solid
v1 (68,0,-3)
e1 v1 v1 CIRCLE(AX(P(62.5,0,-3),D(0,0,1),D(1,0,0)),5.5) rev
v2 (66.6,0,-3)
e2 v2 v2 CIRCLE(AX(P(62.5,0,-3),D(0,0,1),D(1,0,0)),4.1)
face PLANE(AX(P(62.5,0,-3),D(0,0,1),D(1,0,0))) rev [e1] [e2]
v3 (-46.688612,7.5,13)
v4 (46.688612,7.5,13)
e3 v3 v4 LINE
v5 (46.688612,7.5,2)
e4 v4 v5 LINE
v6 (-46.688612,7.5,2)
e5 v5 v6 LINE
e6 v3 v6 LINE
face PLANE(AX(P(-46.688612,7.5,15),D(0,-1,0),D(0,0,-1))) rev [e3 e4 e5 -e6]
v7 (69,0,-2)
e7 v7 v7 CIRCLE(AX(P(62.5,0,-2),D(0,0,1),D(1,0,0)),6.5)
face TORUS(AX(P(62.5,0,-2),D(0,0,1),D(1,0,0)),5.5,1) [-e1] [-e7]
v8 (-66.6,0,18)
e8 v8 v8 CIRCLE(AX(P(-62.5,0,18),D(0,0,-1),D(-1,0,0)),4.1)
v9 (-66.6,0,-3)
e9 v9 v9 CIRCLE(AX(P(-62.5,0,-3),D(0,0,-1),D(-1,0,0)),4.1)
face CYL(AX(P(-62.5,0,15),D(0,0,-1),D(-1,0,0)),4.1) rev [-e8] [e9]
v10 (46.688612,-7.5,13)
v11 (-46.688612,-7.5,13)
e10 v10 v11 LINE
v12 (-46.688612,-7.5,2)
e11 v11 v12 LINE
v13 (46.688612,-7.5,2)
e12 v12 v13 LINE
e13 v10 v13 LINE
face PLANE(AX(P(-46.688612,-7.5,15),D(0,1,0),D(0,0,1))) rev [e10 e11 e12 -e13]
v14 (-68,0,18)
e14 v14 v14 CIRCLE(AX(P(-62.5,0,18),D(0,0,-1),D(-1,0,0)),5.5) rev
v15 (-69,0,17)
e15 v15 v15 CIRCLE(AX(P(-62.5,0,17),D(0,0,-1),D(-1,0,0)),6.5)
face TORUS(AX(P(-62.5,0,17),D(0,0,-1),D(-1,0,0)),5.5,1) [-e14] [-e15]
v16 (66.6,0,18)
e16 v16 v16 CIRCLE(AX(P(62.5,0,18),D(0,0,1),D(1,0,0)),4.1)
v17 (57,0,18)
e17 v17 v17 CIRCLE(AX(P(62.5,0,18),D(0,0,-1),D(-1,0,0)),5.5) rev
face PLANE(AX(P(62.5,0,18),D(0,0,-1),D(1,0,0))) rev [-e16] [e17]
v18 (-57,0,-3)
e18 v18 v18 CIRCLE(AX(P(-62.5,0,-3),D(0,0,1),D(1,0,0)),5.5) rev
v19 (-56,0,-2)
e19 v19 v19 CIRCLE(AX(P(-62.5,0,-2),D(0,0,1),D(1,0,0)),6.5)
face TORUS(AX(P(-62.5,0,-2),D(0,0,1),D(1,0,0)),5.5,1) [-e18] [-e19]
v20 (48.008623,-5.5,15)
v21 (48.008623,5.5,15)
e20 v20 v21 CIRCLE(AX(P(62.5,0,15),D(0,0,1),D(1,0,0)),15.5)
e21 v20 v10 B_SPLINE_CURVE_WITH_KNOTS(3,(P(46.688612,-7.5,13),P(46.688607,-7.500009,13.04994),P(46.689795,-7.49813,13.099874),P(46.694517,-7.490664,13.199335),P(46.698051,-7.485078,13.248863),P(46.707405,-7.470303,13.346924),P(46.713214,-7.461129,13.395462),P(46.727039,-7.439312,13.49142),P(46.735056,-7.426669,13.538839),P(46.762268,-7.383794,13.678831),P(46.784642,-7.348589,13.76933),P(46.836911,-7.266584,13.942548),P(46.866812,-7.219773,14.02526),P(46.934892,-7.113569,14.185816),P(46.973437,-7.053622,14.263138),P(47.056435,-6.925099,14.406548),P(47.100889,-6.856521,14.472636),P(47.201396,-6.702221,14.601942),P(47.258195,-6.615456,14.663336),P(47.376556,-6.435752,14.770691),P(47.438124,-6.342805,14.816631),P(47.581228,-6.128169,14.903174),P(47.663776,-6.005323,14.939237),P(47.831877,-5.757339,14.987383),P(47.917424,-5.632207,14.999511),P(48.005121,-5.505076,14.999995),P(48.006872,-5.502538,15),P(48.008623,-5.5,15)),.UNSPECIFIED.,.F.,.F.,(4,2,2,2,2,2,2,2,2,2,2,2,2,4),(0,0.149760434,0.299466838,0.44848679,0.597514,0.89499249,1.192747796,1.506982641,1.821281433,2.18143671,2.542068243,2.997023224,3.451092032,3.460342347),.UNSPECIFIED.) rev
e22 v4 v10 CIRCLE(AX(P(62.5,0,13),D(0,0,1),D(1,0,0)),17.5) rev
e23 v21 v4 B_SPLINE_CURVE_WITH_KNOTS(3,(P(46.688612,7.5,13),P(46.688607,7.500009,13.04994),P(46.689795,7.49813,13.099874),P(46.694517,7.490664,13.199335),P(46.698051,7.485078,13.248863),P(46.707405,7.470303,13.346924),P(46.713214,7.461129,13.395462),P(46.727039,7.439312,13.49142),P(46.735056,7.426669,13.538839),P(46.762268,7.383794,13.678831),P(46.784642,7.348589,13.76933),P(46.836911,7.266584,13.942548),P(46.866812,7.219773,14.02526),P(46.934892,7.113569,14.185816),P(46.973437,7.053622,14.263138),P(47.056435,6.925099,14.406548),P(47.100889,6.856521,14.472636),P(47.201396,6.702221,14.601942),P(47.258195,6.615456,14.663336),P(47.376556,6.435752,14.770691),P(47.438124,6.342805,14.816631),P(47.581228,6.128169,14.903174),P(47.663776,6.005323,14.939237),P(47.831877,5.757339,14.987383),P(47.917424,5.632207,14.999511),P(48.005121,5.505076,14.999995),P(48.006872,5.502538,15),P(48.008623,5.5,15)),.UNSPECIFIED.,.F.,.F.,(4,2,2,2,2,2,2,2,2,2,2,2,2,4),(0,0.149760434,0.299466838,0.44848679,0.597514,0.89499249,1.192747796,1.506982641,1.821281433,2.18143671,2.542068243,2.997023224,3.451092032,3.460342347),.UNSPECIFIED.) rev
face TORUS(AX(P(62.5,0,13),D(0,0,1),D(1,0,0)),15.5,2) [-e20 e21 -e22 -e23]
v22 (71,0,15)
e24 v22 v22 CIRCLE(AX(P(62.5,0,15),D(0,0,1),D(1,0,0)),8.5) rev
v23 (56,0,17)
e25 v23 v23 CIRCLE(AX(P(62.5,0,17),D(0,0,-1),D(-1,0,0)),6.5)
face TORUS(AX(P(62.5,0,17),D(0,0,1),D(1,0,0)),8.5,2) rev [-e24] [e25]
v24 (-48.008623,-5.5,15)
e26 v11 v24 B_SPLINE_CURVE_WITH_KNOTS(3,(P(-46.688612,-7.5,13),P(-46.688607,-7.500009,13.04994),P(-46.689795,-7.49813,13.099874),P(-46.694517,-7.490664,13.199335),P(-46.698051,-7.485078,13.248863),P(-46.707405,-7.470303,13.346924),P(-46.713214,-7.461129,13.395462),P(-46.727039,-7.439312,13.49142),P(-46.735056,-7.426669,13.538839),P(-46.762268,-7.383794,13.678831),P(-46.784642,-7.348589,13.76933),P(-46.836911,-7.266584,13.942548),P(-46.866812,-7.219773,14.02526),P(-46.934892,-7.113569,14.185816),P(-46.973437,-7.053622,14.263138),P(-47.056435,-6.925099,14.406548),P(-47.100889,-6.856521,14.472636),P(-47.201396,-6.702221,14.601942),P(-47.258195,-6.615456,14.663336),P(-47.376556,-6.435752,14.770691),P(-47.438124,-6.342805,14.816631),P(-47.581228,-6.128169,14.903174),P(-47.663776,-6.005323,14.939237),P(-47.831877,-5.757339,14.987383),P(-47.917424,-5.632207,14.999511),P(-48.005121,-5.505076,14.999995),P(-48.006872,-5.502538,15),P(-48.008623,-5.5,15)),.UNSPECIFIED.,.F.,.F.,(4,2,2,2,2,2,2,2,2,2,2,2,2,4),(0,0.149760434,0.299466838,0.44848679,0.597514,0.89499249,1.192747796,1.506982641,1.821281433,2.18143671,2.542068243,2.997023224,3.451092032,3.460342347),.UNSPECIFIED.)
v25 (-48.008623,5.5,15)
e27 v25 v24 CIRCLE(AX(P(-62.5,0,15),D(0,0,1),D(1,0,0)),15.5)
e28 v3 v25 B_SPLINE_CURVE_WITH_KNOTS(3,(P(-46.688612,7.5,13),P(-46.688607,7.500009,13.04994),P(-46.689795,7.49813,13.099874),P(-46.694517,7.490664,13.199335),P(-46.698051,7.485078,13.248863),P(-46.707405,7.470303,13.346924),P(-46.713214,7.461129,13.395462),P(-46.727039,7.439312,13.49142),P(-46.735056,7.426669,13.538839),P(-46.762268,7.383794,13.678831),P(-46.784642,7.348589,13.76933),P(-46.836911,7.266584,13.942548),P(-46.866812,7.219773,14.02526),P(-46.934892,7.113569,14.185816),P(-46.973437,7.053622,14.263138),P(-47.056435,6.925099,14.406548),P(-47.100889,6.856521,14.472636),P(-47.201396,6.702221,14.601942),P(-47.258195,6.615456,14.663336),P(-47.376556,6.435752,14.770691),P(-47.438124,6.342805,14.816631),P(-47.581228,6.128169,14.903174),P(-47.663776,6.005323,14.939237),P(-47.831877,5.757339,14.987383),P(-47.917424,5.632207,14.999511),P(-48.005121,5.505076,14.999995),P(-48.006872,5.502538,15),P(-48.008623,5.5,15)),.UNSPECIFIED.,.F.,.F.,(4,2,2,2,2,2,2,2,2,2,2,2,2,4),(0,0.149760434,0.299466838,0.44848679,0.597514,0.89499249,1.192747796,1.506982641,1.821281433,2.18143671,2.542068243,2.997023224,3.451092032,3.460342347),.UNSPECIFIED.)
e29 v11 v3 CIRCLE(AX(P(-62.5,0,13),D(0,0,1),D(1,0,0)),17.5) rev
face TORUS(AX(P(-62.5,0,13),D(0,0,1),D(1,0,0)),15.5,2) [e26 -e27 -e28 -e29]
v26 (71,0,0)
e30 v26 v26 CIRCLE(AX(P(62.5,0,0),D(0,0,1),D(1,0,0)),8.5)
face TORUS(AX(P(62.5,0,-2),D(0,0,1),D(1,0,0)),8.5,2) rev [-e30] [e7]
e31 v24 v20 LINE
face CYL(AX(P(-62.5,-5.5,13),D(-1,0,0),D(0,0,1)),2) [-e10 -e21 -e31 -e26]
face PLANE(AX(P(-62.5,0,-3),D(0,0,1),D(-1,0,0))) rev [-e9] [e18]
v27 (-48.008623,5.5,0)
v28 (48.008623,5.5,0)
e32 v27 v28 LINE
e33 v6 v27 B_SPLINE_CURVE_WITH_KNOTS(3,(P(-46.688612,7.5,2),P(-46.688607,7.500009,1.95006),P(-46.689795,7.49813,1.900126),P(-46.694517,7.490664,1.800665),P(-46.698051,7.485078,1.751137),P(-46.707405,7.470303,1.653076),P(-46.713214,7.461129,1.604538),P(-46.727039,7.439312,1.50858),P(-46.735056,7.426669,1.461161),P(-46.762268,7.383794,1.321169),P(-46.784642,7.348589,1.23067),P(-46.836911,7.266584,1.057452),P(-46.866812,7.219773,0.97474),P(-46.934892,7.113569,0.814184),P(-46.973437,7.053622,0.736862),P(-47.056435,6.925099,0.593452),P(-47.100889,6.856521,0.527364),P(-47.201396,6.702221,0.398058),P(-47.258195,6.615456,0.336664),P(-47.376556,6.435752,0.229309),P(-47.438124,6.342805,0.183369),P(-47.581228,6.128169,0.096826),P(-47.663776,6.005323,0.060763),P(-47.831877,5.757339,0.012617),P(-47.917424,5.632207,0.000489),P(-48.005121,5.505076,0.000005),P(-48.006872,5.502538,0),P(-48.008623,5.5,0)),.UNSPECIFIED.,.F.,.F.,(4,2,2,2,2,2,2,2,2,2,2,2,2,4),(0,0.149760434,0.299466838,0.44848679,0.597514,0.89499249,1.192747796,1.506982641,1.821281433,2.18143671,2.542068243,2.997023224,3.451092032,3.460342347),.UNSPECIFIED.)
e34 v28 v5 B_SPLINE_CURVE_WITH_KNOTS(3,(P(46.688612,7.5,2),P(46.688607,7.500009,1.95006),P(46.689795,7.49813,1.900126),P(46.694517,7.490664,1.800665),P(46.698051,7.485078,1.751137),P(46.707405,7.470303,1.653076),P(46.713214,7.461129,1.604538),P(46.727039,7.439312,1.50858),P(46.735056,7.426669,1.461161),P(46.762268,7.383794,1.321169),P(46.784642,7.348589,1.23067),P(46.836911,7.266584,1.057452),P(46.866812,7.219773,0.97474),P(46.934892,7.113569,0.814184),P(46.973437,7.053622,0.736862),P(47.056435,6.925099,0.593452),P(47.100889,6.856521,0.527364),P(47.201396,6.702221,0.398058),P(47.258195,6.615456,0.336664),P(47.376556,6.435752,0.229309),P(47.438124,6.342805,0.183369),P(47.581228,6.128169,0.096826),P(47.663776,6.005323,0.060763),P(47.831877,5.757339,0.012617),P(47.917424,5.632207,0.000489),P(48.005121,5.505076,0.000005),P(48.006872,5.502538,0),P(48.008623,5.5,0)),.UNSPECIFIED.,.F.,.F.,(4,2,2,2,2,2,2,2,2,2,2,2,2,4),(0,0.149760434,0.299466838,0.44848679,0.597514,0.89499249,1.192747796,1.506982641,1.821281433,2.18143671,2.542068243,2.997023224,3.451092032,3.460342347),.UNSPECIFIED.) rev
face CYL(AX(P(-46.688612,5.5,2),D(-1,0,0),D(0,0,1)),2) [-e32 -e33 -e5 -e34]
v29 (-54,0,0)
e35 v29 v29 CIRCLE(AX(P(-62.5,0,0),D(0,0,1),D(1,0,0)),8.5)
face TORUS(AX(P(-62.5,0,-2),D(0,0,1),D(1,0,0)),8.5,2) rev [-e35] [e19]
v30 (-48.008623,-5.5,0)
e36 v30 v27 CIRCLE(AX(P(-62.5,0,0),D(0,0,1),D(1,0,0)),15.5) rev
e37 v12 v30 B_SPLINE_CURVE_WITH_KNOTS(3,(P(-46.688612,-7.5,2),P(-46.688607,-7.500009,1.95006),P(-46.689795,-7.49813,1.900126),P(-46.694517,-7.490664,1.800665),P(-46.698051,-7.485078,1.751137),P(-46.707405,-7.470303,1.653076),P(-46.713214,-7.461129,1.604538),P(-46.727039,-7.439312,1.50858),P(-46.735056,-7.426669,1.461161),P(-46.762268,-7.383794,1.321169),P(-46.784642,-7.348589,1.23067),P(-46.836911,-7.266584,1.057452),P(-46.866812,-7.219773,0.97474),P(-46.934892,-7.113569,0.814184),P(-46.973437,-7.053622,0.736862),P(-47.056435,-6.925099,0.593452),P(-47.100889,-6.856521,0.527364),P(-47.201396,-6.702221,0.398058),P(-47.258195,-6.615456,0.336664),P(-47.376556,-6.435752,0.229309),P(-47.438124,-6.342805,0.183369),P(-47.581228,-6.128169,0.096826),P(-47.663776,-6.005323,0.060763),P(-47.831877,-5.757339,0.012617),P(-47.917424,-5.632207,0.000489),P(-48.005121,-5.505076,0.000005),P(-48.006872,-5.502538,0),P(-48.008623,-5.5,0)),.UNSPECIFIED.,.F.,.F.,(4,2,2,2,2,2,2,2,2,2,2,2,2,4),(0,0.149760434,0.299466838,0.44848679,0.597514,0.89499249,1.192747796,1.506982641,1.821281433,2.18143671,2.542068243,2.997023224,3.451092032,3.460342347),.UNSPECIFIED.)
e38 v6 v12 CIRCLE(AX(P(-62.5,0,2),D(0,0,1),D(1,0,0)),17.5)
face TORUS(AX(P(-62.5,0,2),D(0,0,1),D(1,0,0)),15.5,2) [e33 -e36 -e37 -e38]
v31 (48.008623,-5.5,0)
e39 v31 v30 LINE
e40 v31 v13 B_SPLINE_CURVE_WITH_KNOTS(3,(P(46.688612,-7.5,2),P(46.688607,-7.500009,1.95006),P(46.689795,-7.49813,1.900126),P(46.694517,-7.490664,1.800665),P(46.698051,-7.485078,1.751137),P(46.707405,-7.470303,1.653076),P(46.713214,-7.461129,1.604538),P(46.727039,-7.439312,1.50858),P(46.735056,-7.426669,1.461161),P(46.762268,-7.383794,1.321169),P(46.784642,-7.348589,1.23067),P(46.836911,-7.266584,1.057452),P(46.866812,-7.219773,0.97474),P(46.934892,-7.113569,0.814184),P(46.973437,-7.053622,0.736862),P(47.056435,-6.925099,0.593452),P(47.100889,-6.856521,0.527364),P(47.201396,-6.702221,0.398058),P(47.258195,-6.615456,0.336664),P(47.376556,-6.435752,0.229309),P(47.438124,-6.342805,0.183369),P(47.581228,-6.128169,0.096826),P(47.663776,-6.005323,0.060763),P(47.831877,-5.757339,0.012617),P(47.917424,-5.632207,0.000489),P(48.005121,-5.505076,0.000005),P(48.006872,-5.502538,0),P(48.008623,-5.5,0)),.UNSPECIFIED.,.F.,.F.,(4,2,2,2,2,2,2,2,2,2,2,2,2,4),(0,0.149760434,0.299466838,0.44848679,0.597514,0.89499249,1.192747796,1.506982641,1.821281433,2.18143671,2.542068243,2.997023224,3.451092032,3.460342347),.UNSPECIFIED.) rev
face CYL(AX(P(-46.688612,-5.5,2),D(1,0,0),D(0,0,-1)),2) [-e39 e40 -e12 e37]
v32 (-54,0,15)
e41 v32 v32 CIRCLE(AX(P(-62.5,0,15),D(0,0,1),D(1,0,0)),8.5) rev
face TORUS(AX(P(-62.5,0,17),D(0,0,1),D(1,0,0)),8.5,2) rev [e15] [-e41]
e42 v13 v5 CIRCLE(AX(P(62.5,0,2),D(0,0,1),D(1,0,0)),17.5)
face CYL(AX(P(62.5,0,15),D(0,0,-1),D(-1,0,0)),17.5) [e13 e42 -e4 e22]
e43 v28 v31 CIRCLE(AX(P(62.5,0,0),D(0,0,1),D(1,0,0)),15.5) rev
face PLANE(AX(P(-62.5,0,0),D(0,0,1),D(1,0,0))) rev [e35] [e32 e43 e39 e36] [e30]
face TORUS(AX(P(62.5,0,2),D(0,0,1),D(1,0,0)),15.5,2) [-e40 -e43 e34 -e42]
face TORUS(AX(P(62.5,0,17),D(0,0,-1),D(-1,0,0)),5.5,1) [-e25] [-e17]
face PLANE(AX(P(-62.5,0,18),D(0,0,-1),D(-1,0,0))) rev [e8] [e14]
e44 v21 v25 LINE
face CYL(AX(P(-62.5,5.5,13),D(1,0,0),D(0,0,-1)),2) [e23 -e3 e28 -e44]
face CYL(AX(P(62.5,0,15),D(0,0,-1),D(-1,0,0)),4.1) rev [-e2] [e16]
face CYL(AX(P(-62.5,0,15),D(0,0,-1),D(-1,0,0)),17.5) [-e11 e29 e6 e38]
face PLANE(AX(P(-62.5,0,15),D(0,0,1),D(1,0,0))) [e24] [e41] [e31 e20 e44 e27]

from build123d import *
from build123d.topology import SkipClean

# Parameters (mm, degrees)
SKETCH1_R            = 4.1
BOSS_EXTRUDE1_DEPTH  = 15
BOSS_EXTRUDE2_START  = -3
SKETCH2_R            = 6.5
SKETCH2_R_2          = 4.1
BOSS_EXTRUDE2_DEPTH  = 3
FILLET2_R            = 1
FILLET2_OF_MIRROR1_R = 1
FILLET1_R            = 2


# Read off the part's stored shape, not the designer's step: Mirror2
with BuildPart() as part:
    # Sketch1 → Boss-Extrude1 (new body)
    with BuildSketch(Plane.XY):
        with BuildLine():
            Line((-46.688611699, -7.5), (46.688611699, -7.5))
            ThreePointArc((46.688611699, -7.5), (80, 0), (46.688611699, 7.5))
            Line((46.688611699, 7.5), (-46.688611699, 7.5))
            ThreePointArc((-46.688611699, 7.5), (-80, 0), (-46.688611699, -7.5))
        make_face()
        with Locations((62.5, 0)):
            Circle(SKETCH1_R, mode=Mode.SUBTRACT)
        with Locations((-62.5, 0)):
            Circle(SKETCH1_R, mode=Mode.SUBTRACT)
    extrude(amount=BOSS_EXTRUDE1_DEPTH)

    # Sketch2 → Boss-Extrude2 (add)
    with BuildSketch(Plane.XY.offset(BOSS_EXTRUDE2_START)):
        with Locations((62.5, 0)):
            Circle(SKETCH2_R)
        with Locations((62.5, 0)):
            Circle(SKETCH2_R_2, mode=Mode.SUBTRACT)
    boss_extrude2 = extrude(amount=BOSS_EXTRUDE2_DEPTH)

    # Fillet2
    fillet2_edges = [part.edges().sort_by_distance(p)[0] for p in [
        (56, 0, -3),
    ]]
    fillet(fillet2_edges, radius=FILLET2_R)

    # Mirror1: Boss-Extrude2 across plane
    with SkipClean():  # the faces are left unmerged after this step: merging them gives an invalid solid
        add(boss_extrude2.mirror(Plane(origin=(0, 0, 0), x_dir=(0, 0, 1), z_dir=(1, 0, 0))))

    # Fillet2 of Mirror1
    fillet2_of_mirror1_edges = [part.edges().sort_by_distance(p)[0] for p in [
        (-56, 0, -3),
    ]]
    fillet(fillet2_of_mirror1_edges, radius=FILLET2_OF_MIRROR1_R)

    # Mirror2 outline → Mirror2 (revolve)
    with SkipClean():  # the faces are left unmerged after this step: merging them gives an invalid solid
        with BuildSketch(Plane(origin=(62.5, 0, 0), x_dir=(1, 0, 0), z_dir=(0, -1, 0))):
            with BuildLine():
                Line((6.5, 15), (6.5, 17))
                ThreePointArc((6.5, 17), (6.207106781, 17.707106781), (5.5, 18))
                Line((5.5, 18), (4.1, 18))
                Line((4.1, 18), (4.1, 15))
                Line((4.1, 15), (6.5, 15))
            make_face()
        revolve(axis=Axis((62.5, 0, 0), (0, 0, 1)))
    add(part.part.scale(1), mode=Mode.REPLACE)  # the faces are merged on a copy

    # Mirror2 2 outline → Mirror2 2 (revolve)
    with BuildSketch(Plane(origin=(-62.5, 0, 0), x_dir=(1, 0, 0), z_dir=(0, -1, 0))):
        with BuildLine():
            Line((6.5, 15), (6.5, 17))
            ThreePointArc((6.5, 17), (6.207106781, 17.707106781), (5.5, 18))
            Line((5.5, 18), (4.1, 18))
            Line((4.1, 18), (4.1, 15))
            Line((4.1, 15), (6.5, 15))
        make_face()
    revolve(axis=Axis((-62.5, 0, 0), (0, 0, 1)))

    # Fillet1
    fillet1_edges = [part.edges().sort_by_distance(p)[0] for p in [
        (80, 0, 15),
        (0, 7.5, 15),
        (56, 0, 0),
        (-56, 0, 0),
        (-80, 0, 15),
        (56, 0, 15),
        (0, 7.5, 0),
        (80, 0, 0),
        (-69, 0, 15),
        (0, -7.5, 0),
        (-80, 0, 0),
        (0, -7.5, 15),
    ]]
    fillet(fillet1_edges, radius=FILLET1_R - 0.0001)  # a hair under: the kernel refuses the full size


solid = part.part
